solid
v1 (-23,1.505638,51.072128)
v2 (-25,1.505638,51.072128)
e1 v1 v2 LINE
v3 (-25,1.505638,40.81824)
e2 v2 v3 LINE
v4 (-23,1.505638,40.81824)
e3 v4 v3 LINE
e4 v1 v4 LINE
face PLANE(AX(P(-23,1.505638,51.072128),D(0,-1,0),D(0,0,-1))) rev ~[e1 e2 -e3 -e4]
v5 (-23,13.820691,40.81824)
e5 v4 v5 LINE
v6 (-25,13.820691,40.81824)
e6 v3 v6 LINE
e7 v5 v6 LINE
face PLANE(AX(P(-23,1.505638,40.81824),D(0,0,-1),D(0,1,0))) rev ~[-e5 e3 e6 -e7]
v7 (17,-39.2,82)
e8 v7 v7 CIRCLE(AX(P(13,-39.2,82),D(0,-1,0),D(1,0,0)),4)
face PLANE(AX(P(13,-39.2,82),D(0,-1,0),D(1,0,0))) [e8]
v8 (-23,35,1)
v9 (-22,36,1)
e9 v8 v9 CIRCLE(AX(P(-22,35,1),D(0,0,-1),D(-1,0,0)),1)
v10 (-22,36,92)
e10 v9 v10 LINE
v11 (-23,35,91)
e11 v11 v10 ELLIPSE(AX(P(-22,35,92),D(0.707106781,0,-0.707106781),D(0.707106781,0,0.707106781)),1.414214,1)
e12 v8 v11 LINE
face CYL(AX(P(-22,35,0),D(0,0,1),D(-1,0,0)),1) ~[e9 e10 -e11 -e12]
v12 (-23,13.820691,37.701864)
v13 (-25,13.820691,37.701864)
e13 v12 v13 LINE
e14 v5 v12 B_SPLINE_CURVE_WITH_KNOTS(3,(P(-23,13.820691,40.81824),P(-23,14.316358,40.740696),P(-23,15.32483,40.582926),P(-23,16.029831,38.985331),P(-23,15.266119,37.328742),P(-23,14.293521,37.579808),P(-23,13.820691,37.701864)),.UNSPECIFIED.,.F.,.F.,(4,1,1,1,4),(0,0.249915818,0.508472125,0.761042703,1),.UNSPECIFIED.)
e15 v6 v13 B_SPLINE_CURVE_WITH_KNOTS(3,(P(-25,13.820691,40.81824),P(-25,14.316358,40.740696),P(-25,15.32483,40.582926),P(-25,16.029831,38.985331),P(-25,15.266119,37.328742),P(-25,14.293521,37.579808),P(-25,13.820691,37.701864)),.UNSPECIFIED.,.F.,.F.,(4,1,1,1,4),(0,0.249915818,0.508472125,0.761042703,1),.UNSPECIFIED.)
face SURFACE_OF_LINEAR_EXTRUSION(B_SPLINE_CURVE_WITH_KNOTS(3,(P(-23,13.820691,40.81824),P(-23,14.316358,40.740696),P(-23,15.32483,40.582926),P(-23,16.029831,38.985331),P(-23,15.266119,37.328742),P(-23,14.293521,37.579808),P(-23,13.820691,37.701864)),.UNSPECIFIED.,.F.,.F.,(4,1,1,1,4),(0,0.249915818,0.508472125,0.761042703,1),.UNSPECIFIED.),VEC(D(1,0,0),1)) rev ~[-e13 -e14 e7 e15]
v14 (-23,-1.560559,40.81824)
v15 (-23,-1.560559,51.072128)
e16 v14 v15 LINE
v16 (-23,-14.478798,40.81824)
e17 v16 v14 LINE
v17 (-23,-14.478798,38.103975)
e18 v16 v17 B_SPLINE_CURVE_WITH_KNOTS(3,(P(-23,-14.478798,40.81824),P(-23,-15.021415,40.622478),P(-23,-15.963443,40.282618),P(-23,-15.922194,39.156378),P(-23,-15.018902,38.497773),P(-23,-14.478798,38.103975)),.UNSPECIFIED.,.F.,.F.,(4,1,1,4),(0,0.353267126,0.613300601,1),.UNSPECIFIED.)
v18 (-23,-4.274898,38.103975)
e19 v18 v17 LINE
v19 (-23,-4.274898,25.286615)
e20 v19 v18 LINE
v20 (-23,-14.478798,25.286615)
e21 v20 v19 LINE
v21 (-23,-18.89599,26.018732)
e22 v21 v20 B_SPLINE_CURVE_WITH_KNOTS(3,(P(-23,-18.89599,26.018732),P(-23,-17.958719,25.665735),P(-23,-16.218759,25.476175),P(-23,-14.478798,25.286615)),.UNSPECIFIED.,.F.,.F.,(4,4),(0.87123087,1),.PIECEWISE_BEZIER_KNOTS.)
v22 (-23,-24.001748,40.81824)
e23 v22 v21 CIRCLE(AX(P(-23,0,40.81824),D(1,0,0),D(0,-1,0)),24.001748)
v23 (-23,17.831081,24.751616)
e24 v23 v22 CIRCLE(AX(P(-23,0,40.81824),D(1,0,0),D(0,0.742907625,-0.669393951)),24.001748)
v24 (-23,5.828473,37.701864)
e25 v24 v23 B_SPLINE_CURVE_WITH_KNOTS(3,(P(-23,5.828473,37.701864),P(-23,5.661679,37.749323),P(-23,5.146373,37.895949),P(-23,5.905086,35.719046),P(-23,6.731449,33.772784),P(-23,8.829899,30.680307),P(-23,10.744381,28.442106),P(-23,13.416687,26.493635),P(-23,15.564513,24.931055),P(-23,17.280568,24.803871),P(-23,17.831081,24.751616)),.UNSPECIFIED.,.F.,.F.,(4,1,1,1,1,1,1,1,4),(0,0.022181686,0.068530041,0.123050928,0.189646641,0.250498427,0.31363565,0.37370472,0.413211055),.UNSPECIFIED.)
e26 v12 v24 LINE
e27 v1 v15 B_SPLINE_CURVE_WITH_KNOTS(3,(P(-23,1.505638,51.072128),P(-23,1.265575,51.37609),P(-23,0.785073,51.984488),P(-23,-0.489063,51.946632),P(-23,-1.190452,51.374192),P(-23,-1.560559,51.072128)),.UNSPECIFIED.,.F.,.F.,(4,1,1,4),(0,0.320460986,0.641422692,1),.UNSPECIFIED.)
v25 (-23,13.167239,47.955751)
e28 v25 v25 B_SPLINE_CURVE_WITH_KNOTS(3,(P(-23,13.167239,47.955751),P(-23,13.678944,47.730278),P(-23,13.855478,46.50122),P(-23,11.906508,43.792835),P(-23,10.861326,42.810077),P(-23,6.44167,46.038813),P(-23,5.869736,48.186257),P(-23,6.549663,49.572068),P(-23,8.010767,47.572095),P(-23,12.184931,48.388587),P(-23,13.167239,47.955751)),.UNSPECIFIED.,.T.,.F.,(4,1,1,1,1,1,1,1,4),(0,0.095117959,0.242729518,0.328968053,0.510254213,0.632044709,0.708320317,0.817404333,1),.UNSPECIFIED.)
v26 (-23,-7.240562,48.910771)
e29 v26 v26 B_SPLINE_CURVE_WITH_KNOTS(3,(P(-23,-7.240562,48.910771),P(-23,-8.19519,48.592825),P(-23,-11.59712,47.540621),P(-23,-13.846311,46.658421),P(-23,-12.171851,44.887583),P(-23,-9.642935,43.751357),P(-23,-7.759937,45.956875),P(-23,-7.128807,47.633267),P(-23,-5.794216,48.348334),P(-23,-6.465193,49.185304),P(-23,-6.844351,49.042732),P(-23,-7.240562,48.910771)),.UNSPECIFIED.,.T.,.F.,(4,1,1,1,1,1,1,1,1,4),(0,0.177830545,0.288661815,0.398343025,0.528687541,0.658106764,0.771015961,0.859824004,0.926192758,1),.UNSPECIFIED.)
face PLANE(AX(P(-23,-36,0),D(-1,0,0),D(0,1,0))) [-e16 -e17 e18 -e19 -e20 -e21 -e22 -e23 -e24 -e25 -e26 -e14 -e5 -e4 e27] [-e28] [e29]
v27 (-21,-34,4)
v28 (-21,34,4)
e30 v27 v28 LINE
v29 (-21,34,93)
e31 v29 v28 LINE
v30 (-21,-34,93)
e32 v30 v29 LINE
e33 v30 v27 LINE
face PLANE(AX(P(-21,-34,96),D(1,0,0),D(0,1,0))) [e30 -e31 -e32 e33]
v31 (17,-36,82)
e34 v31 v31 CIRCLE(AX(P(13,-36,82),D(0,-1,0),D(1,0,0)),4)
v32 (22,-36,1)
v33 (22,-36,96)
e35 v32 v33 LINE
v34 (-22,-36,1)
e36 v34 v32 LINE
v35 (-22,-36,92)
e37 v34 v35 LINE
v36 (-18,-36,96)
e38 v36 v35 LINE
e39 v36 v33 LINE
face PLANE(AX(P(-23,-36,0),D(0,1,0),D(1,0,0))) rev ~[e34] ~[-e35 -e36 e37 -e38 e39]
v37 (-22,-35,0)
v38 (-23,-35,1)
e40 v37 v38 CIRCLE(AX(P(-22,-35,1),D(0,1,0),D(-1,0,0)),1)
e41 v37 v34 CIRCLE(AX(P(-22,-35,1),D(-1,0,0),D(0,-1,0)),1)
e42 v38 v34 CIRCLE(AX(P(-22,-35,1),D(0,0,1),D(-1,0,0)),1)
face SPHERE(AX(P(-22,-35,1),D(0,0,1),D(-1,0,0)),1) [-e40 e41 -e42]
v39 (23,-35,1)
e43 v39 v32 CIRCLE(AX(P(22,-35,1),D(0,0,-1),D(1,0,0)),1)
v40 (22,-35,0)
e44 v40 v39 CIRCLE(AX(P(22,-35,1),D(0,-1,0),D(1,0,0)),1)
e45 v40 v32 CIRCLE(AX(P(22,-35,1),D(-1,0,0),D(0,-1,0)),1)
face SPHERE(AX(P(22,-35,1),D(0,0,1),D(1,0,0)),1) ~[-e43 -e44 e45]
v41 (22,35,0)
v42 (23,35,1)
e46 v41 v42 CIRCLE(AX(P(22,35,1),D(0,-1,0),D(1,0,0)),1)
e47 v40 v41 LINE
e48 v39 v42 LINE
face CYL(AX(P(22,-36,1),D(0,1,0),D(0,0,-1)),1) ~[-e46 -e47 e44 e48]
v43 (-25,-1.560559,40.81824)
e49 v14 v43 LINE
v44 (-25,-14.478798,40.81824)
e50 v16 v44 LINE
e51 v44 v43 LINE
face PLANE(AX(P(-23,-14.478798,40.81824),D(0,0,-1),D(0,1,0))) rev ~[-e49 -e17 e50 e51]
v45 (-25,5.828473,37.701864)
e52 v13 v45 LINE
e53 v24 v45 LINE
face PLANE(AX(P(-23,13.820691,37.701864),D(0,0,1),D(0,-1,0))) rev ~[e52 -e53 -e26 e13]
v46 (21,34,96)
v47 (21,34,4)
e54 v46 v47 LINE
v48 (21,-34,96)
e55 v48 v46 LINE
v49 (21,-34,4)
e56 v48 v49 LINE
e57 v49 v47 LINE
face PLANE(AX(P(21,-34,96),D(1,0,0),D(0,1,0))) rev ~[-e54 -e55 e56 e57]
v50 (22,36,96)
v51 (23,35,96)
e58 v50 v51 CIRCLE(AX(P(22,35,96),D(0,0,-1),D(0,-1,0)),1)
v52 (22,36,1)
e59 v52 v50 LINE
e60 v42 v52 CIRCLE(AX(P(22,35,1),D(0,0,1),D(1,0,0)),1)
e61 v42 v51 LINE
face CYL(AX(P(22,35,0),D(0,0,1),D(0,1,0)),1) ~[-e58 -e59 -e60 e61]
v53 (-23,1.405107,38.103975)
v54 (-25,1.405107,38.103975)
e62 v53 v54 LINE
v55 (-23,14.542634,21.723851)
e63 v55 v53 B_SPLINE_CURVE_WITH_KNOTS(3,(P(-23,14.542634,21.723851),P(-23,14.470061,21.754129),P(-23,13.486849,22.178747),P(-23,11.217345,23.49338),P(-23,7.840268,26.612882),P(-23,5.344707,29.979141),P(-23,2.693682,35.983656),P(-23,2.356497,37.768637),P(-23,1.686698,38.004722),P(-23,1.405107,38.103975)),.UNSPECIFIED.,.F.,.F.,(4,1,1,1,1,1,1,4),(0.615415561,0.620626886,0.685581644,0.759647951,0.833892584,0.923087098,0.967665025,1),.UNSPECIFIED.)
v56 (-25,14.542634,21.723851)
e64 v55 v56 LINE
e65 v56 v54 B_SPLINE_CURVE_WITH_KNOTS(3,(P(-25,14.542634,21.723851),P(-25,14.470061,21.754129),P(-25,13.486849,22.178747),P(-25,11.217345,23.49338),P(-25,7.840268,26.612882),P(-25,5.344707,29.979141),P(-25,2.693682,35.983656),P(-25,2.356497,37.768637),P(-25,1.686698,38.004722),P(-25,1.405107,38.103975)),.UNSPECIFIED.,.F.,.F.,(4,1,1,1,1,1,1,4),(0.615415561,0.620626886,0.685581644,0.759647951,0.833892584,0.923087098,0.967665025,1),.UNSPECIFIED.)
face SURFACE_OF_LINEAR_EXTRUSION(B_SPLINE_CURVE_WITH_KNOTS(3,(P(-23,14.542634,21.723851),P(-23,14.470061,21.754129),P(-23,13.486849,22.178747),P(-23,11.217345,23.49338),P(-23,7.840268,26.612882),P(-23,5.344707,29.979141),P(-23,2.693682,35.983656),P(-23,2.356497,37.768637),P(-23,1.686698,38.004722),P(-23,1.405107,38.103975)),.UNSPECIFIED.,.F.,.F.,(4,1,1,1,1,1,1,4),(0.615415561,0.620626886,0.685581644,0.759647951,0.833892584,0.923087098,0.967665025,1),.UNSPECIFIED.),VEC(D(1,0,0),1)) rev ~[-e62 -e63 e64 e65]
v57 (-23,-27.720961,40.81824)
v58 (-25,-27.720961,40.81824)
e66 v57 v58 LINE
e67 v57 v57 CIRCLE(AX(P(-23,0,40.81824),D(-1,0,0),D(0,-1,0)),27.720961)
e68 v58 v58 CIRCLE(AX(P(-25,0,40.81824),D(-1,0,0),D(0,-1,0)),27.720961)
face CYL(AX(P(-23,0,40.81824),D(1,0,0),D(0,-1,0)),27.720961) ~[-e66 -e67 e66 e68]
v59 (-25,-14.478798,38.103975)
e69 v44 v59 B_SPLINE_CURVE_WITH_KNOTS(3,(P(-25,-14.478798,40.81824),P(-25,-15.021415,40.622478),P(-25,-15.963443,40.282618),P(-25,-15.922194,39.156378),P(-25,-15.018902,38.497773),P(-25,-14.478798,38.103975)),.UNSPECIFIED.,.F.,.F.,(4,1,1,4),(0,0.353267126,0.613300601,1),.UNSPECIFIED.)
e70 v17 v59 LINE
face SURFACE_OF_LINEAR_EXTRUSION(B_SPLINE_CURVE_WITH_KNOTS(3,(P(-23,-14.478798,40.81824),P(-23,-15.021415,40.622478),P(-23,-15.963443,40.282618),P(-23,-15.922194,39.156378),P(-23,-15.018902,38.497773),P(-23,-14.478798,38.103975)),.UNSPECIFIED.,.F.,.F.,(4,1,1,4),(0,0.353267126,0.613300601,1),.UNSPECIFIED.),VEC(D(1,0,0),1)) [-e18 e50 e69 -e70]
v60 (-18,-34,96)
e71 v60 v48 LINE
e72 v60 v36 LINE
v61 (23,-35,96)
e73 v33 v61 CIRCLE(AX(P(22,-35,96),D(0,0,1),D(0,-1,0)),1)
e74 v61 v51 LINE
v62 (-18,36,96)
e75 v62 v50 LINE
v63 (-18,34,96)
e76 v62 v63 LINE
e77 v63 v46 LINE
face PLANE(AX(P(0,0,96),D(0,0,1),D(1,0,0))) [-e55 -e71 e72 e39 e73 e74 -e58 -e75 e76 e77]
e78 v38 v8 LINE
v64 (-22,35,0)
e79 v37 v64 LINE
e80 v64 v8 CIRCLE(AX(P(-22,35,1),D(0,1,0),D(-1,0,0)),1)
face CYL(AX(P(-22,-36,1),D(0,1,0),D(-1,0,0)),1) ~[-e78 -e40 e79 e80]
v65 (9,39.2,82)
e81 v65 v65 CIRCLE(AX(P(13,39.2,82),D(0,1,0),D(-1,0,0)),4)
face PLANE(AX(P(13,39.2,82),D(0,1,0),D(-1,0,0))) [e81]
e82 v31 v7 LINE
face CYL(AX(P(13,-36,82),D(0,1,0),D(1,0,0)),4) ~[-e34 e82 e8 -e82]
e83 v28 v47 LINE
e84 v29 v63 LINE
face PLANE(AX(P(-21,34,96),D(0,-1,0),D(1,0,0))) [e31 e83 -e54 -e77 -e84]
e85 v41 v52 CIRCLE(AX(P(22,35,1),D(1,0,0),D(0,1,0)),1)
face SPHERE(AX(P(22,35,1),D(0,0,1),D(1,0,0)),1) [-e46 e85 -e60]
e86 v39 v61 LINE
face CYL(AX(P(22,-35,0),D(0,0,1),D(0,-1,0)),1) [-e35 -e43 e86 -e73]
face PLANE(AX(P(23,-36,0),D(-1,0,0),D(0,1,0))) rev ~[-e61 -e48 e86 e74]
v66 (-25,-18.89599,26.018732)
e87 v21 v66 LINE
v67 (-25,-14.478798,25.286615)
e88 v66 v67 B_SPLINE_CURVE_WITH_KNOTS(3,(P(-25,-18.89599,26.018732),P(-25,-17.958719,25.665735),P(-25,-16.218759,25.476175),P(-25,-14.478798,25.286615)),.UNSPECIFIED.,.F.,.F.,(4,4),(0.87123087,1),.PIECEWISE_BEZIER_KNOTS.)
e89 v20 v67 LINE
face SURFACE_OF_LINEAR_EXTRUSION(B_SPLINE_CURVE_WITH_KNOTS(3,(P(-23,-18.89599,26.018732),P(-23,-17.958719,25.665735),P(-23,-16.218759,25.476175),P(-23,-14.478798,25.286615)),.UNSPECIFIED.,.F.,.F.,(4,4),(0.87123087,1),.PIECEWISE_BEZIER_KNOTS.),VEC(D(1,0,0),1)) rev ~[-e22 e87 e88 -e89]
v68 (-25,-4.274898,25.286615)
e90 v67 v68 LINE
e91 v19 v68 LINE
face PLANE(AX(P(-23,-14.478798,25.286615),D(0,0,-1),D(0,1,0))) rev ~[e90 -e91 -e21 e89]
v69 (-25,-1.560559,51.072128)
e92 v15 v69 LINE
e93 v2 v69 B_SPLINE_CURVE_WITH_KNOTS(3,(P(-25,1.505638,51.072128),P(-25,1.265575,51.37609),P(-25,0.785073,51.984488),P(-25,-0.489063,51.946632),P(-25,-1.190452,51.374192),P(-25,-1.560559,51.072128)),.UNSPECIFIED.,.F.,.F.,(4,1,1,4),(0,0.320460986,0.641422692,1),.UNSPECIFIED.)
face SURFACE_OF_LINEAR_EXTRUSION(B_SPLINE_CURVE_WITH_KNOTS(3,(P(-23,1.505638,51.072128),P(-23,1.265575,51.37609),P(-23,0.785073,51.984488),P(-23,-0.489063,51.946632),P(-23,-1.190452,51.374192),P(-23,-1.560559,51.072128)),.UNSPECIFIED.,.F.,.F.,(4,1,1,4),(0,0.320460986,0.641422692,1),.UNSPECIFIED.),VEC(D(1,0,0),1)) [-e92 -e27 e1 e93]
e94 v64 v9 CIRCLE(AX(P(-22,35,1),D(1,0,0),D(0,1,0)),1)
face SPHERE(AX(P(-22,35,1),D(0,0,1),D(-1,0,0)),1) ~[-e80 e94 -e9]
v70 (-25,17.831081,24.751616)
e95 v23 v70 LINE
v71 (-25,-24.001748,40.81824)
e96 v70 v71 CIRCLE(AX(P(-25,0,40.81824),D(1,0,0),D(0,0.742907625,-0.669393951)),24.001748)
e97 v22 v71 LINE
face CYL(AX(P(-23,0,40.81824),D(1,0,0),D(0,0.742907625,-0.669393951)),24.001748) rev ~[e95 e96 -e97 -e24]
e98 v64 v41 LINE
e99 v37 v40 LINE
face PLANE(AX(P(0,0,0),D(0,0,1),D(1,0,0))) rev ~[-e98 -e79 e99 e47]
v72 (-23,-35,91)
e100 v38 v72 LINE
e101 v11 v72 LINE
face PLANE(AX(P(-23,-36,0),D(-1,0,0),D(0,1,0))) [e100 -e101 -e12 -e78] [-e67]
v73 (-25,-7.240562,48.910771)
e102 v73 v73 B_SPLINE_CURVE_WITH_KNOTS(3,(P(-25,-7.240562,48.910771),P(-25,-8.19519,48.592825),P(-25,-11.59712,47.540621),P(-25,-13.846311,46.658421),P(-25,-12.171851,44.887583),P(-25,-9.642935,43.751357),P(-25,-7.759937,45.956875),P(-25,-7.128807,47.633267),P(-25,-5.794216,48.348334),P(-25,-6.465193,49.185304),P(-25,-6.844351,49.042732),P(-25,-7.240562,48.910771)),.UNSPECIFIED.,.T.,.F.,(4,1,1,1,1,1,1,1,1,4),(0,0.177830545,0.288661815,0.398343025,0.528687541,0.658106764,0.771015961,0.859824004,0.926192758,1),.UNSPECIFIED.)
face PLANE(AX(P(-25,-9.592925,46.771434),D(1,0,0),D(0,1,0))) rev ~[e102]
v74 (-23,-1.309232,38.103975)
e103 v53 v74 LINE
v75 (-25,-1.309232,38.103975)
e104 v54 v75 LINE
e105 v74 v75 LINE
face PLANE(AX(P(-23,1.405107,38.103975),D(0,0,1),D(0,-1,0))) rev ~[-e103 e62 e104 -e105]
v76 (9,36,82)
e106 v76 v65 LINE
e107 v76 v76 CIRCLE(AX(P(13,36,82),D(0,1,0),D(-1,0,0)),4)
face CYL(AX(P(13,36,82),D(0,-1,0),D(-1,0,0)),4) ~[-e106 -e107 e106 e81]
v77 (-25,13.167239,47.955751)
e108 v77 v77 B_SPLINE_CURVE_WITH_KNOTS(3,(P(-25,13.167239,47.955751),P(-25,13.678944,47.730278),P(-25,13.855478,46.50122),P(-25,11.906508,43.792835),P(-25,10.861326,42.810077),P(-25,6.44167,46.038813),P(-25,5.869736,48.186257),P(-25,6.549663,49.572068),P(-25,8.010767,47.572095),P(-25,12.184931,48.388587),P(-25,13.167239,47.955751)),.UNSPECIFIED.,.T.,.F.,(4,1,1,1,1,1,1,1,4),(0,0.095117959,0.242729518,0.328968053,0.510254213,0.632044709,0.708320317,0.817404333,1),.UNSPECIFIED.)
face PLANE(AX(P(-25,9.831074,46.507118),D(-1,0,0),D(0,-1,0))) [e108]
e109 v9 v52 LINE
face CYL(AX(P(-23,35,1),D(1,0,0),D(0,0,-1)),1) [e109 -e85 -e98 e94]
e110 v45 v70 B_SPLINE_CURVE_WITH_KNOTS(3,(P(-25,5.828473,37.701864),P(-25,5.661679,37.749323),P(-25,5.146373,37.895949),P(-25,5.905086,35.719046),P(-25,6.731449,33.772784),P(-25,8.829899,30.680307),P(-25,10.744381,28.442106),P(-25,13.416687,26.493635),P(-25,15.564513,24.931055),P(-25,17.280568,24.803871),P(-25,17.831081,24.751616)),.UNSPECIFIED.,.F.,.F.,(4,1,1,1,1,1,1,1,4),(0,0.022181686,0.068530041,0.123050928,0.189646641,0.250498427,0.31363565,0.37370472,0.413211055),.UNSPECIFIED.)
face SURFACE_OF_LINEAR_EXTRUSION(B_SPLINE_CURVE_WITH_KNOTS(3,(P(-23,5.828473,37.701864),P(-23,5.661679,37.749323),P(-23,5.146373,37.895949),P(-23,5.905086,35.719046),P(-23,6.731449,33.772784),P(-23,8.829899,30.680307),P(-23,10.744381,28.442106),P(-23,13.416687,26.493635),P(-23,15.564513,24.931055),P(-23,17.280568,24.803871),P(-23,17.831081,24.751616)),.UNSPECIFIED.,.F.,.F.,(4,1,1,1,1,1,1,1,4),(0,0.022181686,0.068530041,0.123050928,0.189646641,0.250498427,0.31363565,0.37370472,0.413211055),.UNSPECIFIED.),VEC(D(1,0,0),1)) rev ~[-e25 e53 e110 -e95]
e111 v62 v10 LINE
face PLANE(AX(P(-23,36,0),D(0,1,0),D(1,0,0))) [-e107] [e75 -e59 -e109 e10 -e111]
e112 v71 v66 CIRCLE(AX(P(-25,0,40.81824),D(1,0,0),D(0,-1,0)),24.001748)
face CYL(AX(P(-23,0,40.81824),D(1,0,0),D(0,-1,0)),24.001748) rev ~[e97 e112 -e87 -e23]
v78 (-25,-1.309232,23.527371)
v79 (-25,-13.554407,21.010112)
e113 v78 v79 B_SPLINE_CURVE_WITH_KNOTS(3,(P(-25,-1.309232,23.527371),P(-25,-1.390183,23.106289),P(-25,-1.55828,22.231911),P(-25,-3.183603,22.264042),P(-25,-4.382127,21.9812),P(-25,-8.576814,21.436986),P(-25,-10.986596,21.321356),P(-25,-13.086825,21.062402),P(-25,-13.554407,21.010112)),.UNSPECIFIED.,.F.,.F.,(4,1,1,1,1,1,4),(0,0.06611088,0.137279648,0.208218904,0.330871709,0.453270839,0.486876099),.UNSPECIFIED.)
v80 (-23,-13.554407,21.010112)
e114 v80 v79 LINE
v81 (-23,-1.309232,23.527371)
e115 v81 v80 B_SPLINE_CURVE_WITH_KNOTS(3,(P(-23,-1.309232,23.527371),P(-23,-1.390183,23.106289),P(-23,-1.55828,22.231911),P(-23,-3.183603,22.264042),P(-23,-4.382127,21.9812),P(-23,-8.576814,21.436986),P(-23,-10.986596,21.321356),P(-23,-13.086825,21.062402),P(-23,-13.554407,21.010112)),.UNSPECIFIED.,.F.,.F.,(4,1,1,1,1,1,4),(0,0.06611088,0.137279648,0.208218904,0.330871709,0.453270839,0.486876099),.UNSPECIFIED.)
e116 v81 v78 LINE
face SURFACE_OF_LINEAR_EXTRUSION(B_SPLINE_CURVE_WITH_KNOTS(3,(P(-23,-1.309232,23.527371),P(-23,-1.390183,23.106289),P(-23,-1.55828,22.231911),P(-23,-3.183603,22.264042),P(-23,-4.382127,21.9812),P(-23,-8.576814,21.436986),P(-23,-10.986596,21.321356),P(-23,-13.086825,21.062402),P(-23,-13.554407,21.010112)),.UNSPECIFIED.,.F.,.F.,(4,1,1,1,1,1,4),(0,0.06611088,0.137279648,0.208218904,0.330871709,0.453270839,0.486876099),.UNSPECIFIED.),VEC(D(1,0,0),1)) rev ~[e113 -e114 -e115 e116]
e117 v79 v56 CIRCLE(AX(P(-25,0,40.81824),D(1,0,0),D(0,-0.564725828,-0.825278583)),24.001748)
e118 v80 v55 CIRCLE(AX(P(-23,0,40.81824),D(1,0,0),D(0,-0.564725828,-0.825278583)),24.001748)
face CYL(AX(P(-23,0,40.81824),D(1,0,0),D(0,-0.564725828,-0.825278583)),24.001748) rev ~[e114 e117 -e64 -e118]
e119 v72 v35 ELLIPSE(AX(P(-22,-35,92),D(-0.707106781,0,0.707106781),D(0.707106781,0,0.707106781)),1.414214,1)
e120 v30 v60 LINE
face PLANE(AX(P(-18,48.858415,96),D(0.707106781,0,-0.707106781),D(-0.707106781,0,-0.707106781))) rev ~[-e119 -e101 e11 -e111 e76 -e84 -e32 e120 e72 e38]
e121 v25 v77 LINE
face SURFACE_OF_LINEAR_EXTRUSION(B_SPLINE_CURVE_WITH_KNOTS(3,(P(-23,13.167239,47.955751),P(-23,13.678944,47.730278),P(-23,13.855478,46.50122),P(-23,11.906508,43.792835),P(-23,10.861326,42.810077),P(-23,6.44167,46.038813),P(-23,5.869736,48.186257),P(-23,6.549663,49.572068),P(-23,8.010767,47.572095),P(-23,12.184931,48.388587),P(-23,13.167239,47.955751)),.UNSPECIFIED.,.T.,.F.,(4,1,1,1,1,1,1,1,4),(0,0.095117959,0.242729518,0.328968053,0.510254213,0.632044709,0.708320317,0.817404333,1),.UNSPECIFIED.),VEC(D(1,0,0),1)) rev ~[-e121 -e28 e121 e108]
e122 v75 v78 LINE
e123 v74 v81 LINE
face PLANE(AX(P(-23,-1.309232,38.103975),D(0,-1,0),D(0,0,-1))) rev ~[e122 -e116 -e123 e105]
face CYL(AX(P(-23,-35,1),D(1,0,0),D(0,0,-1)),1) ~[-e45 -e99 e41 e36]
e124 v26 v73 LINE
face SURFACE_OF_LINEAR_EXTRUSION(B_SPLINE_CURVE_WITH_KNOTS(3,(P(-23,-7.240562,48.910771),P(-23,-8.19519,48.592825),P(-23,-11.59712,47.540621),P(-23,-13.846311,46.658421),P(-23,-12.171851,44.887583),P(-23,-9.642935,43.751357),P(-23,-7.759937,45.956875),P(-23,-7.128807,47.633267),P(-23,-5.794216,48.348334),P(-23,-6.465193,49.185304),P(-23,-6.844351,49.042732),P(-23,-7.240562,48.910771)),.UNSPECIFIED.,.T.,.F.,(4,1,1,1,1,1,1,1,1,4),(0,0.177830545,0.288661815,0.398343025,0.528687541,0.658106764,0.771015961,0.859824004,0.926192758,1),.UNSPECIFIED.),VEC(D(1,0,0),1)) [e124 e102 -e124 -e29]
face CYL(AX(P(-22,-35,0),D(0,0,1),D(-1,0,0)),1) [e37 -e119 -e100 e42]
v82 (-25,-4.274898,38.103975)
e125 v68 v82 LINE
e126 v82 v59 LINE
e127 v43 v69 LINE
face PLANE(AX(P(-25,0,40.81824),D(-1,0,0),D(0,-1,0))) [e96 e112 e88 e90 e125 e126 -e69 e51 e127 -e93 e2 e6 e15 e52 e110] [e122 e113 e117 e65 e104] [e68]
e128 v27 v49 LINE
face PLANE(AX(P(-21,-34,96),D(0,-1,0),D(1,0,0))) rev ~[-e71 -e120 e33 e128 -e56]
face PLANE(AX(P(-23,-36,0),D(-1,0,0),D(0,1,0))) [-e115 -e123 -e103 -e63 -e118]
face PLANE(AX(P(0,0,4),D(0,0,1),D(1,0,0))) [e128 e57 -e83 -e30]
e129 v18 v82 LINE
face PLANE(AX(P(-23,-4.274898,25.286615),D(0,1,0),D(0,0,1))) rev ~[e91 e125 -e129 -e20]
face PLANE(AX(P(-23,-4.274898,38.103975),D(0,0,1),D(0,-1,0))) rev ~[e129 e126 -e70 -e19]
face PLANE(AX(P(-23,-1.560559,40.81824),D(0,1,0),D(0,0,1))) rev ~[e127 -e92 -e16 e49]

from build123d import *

# Parameters (mm, degrees)
F0_W        = 46
F0_H        = 72
F1_DEPTH    = 96
F2_W        = 42
F2_H        = 68
F3_DEPTH    = 92
F4_R        = 4
F5_DEPTH    = 3.2
F6_R        = 4
F7_DEPTH    = 3.2
F8_T1_DEPTH = 97.7168298797
F9_R        = 1
F10_R       = 27.7209608442
F11_DEPTH   = 2


# Not quite as in the source:
# - a fillet or chamfer that OpenCascade refuses, or shapes differently, is made with other operations: its cross-section is extruded or revolved along the edge and cut away or added


with BuildPart() as f1:
    # F0 (on Top) → F1 (new body)
    with BuildSketch(Plane.XY):
        Rectangle(F0_W, F0_H)
    extrude(amount=F1_DEPTH)

    # F2 (on face) → F3 (cut)
    with BuildSketch(Plane.XY.offset(96)):
        Rectangle(F2_W, F2_H)
    extrude(amount=-F3_DEPTH, mode=Mode.SUBTRACT)

    # F4 (on face) → F5 (join)
    with BuildSketch(Plane.XZ.offset(36)):
        with Locations((13, 82)):
            Circle(F4_R)
    extrude(amount=F5_DEPTH)

    # F6 (on face) → F7 (join)
    with BuildSketch(Plane(origin=(0, 36, 0), x_dir=(-1, 0, 0), z_dir=(0, 1, 0))):
        with Locations((-13, 82)):
            Circle(F6_R)
    extrude(amount=F7_DEPTH)

    # F8: chamfer of 5 on 1 edges, made by hand

    # F8_s2 → F8_t1 (cut)
    with BuildSketch(Plane.XZ.offset(-48.8584149398)):
        Polygon((-18, 96), (-23, 91), (-23, 96), align=None)
    extrude(amount=F8_T1_DEPTH, mode=Mode.SUBTRACT)

    # F9
    f9_edges = [f1.edges().sort_by_distance(p)[0] for p in [
        (-23, -36, 45.5),
        (23, -36, 48),
        (23, 36, 48),
        (-23, 36, 45.5),
        (23, 0, 0),
        (-23, 0, 0),
        (0, 36, 0),
        (0, -36, 0),
    ]]
    fillet(f9_edges, radius=F9_R)

    # F10 (on face) → F11 (join)
    with BuildSketch(Plane(origin=(-23, 0, 0), x_dir=(0, -1, 0), z_dir=(-1, 0, 0))):
        with Locations((0, 40.8182404935)):
            Circle(F10_R)
        with BuildLine():
            add(Edge.make_bspline(
                [(-17.8310812866, 24.7516158604), (-18.0416931886, 24.731624497), (-18.6386807496, 24.6684959969), (-19.2717295968, 24.3841029538), (-19.5649090195, 21.6870798509), (-16.5966593688, 21.0684697904), (-15.2211504824, 21.4407750456), (-14.5426337104, 21.7238514822)],
                knots=[0.4132110552, 0.4132110552, 0.4132110552, 0.4132110552, 0.4283251344, 0.4603190645, 0.510541782, 0.5666924956, 0.615415561, 0.615415561, 0.615415561, 0.615415561], degree=3))
            ThreePointArc((-17.8310812866, 24.7516158604), (-8.6054277875, 63.2242776163), (24.0017475812, 40.8182404935))
            ThreePointArc((24.0017475812, 40.8182404935), (22.6894322226, 32.9904980114), (18.8959899976, 26.0187320907))
            add(Edge.make_bspline(
                [(13.5544067846, 21.0101122713), (15.1773683066, 20.8286148298), (18.6415516168, 20.5611168513), (20.2513827461, 23.1969599021), (20.017563928, 26.727985113), (19.3356446095, 26.1886613097), (18.9151411243, 26.0259448267), (18.8959899976, 26.0187320907)],
                knots=[0.4868760993, 0.4868760993, 0.4868760993, 0.4868760993, 0.6035189288, 0.7106541171, 0.8124300784, 0.8685997483, 0.87123087, 0.87123087, 0.87123087, 0.87123087], degree=3))
            ThreePointArc((13.5544067846, 21.0101122713), (-0.6095113038, 16.8242332642), (-14.5426337104, 21.7238514822))
        make_face(mode=Mode.SUBTRACT)
        with BuildLine():
            add(Edge.make_bspline(
                [(-13.1672387943, 47.9557514191), (-13.6789435568, 47.7302779724), (-13.8554780387, 46.5012200329), (-11.906507855, 43.7928351191), (-10.8613262187, 42.8100774548), (-6.4416701192, 46.0388131445), (-5.8697363247, 48.1862573802), (-6.5496625571, 49.5720681387), (-8.0107671732, 47.5720952119), (-12.18493142, 48.3885873933), (-13.1672387943, 47.9557514191)],
                knots=[0, 0, 0, 0, 0.0951179589, 0.2427295185, 0.3289680533, 0.5102542132, 0.6320447089, 0.7083203168, 0.817404333, 1, 1, 1, 1], degree=3))
        make_face()
        with BuildLine():
            add(Edge.make_bspline(
                [(-1.5056377742, 51.0721281171), (-1.2655745051, 51.376089636), (-0.785072868, 51.9844876136), (0.4890633383, 51.9466317035), (1.1904519521, 51.3741917059), (1.5605587978, 51.0721281171)],
                knots=[0, 0, 0, 0, 0.3204609859, 0.6414226921, 1, 1, 1, 1], degree=3))
            Line((-1.5056377742, 51.0721281171), (-1.5056377742, 40.8182404935))
            Line((-1.5056377742, 40.8182404935), (-13.8206910342, 40.8182404935))
            add(Edge.make_bspline(
                [(-13.8206910342, 40.8182404935), (-14.3163583008, 40.7406958322), (-15.3248298347, 40.5829255117), (-16.0298313022, 38.9853309187), (-15.2661185632, 37.3287424191), (-14.2935212413, 37.5798078265), (-13.8206910342, 37.7018637955)],
                knots=[0, 0, 0, 0, 0.2499158182, 0.5084721255, 0.7610427034, 1, 1, 1, 1], degree=3))
            Line((-13.8206910342, 37.7018637955), (-5.8284727857, 37.7018637955))
            add(Edge.make_bspline(
                [(-5.8284727857, 37.7018637955), (-5.6616792118, 37.7493233921), (-5.1463725609, 37.8959492194), (-5.9050859697, 35.7190459632), (-6.7314491211, 33.7727840823), (-8.8298986523, 30.6803066265), (-10.7443809665, 28.4421062956), (-13.4166866054, 26.493634755), (-15.5645127805, 24.9310548857), (-17.2805677978, 24.8038708143), (-17.8310812866, 24.7516158604)],
                knots=[0, 0, 0, 0, 0.0221816863, 0.0685300411, 0.1230509283, 0.1896466414, 0.2504984271, 0.3136356503, 0.3737047196, 0.4132110552, 0.4132110552, 0.4132110552, 0.4132110552], degree=3))
            ThreePointArc((-17.8310812866, 24.7516158604), (-16.2574965773, 23.1610127385), (-14.5426337104, 21.7238514822))
            add(Edge.make_bspline(
                [(-14.5426337104, 21.7238514822), (-14.4700608663, 21.7541287914), (-13.4868489797, 22.1787471182), (-11.2173445731, 23.4933801542), (-7.8402676501, 26.6128816263), (-5.3447073755, 29.9791410107), (-2.6936822721, 35.9836558885), (-2.3564969432, 37.7686367648), (-1.6866975363, 38.0047224883), (-1.4051069738, 38.1039753556)],
                knots=[0.615415561, 0.615415561, 0.615415561, 0.615415561, 0.620626886, 0.6855816442, 0.7596479515, 0.8338925842, 0.9230870978, 0.9676650246, 1, 1, 1, 1], degree=3))
            Line((-1.4051069738, 38.1039753556), (1.3092315057, 38.1039753556))
            Line((1.3092315057, 38.1039753556), (1.3092315057, 23.5273707658))
            add(Edge.make_bspline(
                [(1.3092315057, 23.5273707658), (1.3901833114, 23.1062891887), (1.5582802327, 22.2319107086), (3.1836032161, 22.2640424108), (4.3821273184, 21.9811997778), (8.5768144522, 21.4369863905), (10.9865964285, 21.3213558963), (13.0868251542, 21.0624024017), (13.5544067846, 21.0101122713)],
                knots=[0, 0, 0, 0, 0.0661108801, 0.1372796485, 0.2082189036, 0.3308717094, 0.453270839, 0.4868760993, 0.4868760993, 0.4868760993, 0.4868760993], degree=3))
            ThreePointArc((13.5544067846, 21.0101122713), (16.4173271562, 23.3095210658), (18.8959899976, 26.0187320907))
            add(Edge.make_bspline(
                [(18.8959899976, 26.0187320907), (17.958719042, 25.6657352116), (16.2187585332, 25.4761750532), (14.4787980244, 25.2866148949)],
                knots=[0.87123087, 0.87123087, 0.87123087, 0.87123087, 1, 1, 1, 1], degree=3))
            Line((14.4787980244, 25.2866148949), (4.274897743, 25.2866148949))
            Line((4.274897743, 25.2866148949), (4.274897743, 38.1039753556))
            Line((4.274897743, 38.1039753556), (14.4787980244, 38.1039753556))
            add(Edge.make_bspline(
                [(14.4787980244, 40.8182404935), (15.0214152926, 40.622477907), (15.9634432149, 40.2826180585), (15.9221942597, 39.1563781008), (15.0189015911, 38.4977733041), (14.4787980244, 38.1039753556)],
                knots=[0, 0, 0, 0, 0.3532671261, 0.6133006012, 1, 1, 1, 1], degree=3))
            Line((14.4787980244, 40.8182404935), (1.5605587978, 40.8182404935))
            Line((1.5605587978, 40.8182404935), (1.5605587978, 51.0721281171))
        make_face()
        with BuildLine():
            add(Edge.make_bspline(
                [(7.2405622341, 48.9107705653), (8.1951903629, 48.5928249221), (11.5971201687, 47.54062061), (13.8463110022, 46.6584207463), (12.1718507315, 44.887582687), (9.6429349022, 43.7513572457), (7.7599373396, 45.9568749284), (7.1288066509, 47.6332666706), (5.7942155786, 48.3483342452), (6.4651933332, 49.1853042153), (6.8443509441, 49.0427315348), (7.2405622341, 48.9107705653)],
                knots=[0, 0, 0, 0, 0.1778305446, 0.288661815, 0.3983430252, 0.5286875411, 0.6581067636, 0.7710159609, 0.8598240036, 0.9261927579, 1, 1, 1, 1], degree=3))
        make_face()
        with BuildLine():
            ThreePointArc((-14.5426337104, 21.7238514822), (-16.2574965773, 23.1610127385), (-17.8310812866, 24.7516158604))
            add(Edge.make_bspline(
                [(-17.8310812866, 24.7516158604), (-18.0416931886, 24.731624497), (-18.6386807496, 24.6684959969), (-19.2717295968, 24.3841029538), (-19.5649090195, 21.6870798509), (-16.5966593688, 21.0684697904), (-15.2211504824, 21.4407750456), (-14.5426337104, 21.7238514822)],
                knots=[0.4132110552, 0.4132110552, 0.4132110552, 0.4132110552, 0.4283251344, 0.4603190645, 0.510541782, 0.5666924956, 0.615415561, 0.615415561, 0.615415561, 0.615415561], degree=3))
        make_face()
        with BuildLine():
            ThreePointArc((18.8959899976, 26.0187320907), (16.4173271562, 23.3095210658), (13.5544067846, 21.0101122713))
            add(Edge.make_bspline(
                [(13.5544067846, 21.0101122713), (15.1773683066, 20.8286148298), (18.6415516168, 20.5611168513), (20.2513827461, 23.1969599021), (20.017563928, 26.727985113), (19.3356446095, 26.1886613097), (18.9151411243, 26.0259448267), (18.8959899976, 26.0187320907)],
                knots=[0.4868760993, 0.4868760993, 0.4868760993, 0.4868760993, 0.6035189288, 0.7106541171, 0.8124300784, 0.8685997483, 0.87123087, 0.87123087, 0.87123087, 0.87123087], degree=3))
        make_face()
    extrude(amount=F11_DEPTH)


solid = f1.part
